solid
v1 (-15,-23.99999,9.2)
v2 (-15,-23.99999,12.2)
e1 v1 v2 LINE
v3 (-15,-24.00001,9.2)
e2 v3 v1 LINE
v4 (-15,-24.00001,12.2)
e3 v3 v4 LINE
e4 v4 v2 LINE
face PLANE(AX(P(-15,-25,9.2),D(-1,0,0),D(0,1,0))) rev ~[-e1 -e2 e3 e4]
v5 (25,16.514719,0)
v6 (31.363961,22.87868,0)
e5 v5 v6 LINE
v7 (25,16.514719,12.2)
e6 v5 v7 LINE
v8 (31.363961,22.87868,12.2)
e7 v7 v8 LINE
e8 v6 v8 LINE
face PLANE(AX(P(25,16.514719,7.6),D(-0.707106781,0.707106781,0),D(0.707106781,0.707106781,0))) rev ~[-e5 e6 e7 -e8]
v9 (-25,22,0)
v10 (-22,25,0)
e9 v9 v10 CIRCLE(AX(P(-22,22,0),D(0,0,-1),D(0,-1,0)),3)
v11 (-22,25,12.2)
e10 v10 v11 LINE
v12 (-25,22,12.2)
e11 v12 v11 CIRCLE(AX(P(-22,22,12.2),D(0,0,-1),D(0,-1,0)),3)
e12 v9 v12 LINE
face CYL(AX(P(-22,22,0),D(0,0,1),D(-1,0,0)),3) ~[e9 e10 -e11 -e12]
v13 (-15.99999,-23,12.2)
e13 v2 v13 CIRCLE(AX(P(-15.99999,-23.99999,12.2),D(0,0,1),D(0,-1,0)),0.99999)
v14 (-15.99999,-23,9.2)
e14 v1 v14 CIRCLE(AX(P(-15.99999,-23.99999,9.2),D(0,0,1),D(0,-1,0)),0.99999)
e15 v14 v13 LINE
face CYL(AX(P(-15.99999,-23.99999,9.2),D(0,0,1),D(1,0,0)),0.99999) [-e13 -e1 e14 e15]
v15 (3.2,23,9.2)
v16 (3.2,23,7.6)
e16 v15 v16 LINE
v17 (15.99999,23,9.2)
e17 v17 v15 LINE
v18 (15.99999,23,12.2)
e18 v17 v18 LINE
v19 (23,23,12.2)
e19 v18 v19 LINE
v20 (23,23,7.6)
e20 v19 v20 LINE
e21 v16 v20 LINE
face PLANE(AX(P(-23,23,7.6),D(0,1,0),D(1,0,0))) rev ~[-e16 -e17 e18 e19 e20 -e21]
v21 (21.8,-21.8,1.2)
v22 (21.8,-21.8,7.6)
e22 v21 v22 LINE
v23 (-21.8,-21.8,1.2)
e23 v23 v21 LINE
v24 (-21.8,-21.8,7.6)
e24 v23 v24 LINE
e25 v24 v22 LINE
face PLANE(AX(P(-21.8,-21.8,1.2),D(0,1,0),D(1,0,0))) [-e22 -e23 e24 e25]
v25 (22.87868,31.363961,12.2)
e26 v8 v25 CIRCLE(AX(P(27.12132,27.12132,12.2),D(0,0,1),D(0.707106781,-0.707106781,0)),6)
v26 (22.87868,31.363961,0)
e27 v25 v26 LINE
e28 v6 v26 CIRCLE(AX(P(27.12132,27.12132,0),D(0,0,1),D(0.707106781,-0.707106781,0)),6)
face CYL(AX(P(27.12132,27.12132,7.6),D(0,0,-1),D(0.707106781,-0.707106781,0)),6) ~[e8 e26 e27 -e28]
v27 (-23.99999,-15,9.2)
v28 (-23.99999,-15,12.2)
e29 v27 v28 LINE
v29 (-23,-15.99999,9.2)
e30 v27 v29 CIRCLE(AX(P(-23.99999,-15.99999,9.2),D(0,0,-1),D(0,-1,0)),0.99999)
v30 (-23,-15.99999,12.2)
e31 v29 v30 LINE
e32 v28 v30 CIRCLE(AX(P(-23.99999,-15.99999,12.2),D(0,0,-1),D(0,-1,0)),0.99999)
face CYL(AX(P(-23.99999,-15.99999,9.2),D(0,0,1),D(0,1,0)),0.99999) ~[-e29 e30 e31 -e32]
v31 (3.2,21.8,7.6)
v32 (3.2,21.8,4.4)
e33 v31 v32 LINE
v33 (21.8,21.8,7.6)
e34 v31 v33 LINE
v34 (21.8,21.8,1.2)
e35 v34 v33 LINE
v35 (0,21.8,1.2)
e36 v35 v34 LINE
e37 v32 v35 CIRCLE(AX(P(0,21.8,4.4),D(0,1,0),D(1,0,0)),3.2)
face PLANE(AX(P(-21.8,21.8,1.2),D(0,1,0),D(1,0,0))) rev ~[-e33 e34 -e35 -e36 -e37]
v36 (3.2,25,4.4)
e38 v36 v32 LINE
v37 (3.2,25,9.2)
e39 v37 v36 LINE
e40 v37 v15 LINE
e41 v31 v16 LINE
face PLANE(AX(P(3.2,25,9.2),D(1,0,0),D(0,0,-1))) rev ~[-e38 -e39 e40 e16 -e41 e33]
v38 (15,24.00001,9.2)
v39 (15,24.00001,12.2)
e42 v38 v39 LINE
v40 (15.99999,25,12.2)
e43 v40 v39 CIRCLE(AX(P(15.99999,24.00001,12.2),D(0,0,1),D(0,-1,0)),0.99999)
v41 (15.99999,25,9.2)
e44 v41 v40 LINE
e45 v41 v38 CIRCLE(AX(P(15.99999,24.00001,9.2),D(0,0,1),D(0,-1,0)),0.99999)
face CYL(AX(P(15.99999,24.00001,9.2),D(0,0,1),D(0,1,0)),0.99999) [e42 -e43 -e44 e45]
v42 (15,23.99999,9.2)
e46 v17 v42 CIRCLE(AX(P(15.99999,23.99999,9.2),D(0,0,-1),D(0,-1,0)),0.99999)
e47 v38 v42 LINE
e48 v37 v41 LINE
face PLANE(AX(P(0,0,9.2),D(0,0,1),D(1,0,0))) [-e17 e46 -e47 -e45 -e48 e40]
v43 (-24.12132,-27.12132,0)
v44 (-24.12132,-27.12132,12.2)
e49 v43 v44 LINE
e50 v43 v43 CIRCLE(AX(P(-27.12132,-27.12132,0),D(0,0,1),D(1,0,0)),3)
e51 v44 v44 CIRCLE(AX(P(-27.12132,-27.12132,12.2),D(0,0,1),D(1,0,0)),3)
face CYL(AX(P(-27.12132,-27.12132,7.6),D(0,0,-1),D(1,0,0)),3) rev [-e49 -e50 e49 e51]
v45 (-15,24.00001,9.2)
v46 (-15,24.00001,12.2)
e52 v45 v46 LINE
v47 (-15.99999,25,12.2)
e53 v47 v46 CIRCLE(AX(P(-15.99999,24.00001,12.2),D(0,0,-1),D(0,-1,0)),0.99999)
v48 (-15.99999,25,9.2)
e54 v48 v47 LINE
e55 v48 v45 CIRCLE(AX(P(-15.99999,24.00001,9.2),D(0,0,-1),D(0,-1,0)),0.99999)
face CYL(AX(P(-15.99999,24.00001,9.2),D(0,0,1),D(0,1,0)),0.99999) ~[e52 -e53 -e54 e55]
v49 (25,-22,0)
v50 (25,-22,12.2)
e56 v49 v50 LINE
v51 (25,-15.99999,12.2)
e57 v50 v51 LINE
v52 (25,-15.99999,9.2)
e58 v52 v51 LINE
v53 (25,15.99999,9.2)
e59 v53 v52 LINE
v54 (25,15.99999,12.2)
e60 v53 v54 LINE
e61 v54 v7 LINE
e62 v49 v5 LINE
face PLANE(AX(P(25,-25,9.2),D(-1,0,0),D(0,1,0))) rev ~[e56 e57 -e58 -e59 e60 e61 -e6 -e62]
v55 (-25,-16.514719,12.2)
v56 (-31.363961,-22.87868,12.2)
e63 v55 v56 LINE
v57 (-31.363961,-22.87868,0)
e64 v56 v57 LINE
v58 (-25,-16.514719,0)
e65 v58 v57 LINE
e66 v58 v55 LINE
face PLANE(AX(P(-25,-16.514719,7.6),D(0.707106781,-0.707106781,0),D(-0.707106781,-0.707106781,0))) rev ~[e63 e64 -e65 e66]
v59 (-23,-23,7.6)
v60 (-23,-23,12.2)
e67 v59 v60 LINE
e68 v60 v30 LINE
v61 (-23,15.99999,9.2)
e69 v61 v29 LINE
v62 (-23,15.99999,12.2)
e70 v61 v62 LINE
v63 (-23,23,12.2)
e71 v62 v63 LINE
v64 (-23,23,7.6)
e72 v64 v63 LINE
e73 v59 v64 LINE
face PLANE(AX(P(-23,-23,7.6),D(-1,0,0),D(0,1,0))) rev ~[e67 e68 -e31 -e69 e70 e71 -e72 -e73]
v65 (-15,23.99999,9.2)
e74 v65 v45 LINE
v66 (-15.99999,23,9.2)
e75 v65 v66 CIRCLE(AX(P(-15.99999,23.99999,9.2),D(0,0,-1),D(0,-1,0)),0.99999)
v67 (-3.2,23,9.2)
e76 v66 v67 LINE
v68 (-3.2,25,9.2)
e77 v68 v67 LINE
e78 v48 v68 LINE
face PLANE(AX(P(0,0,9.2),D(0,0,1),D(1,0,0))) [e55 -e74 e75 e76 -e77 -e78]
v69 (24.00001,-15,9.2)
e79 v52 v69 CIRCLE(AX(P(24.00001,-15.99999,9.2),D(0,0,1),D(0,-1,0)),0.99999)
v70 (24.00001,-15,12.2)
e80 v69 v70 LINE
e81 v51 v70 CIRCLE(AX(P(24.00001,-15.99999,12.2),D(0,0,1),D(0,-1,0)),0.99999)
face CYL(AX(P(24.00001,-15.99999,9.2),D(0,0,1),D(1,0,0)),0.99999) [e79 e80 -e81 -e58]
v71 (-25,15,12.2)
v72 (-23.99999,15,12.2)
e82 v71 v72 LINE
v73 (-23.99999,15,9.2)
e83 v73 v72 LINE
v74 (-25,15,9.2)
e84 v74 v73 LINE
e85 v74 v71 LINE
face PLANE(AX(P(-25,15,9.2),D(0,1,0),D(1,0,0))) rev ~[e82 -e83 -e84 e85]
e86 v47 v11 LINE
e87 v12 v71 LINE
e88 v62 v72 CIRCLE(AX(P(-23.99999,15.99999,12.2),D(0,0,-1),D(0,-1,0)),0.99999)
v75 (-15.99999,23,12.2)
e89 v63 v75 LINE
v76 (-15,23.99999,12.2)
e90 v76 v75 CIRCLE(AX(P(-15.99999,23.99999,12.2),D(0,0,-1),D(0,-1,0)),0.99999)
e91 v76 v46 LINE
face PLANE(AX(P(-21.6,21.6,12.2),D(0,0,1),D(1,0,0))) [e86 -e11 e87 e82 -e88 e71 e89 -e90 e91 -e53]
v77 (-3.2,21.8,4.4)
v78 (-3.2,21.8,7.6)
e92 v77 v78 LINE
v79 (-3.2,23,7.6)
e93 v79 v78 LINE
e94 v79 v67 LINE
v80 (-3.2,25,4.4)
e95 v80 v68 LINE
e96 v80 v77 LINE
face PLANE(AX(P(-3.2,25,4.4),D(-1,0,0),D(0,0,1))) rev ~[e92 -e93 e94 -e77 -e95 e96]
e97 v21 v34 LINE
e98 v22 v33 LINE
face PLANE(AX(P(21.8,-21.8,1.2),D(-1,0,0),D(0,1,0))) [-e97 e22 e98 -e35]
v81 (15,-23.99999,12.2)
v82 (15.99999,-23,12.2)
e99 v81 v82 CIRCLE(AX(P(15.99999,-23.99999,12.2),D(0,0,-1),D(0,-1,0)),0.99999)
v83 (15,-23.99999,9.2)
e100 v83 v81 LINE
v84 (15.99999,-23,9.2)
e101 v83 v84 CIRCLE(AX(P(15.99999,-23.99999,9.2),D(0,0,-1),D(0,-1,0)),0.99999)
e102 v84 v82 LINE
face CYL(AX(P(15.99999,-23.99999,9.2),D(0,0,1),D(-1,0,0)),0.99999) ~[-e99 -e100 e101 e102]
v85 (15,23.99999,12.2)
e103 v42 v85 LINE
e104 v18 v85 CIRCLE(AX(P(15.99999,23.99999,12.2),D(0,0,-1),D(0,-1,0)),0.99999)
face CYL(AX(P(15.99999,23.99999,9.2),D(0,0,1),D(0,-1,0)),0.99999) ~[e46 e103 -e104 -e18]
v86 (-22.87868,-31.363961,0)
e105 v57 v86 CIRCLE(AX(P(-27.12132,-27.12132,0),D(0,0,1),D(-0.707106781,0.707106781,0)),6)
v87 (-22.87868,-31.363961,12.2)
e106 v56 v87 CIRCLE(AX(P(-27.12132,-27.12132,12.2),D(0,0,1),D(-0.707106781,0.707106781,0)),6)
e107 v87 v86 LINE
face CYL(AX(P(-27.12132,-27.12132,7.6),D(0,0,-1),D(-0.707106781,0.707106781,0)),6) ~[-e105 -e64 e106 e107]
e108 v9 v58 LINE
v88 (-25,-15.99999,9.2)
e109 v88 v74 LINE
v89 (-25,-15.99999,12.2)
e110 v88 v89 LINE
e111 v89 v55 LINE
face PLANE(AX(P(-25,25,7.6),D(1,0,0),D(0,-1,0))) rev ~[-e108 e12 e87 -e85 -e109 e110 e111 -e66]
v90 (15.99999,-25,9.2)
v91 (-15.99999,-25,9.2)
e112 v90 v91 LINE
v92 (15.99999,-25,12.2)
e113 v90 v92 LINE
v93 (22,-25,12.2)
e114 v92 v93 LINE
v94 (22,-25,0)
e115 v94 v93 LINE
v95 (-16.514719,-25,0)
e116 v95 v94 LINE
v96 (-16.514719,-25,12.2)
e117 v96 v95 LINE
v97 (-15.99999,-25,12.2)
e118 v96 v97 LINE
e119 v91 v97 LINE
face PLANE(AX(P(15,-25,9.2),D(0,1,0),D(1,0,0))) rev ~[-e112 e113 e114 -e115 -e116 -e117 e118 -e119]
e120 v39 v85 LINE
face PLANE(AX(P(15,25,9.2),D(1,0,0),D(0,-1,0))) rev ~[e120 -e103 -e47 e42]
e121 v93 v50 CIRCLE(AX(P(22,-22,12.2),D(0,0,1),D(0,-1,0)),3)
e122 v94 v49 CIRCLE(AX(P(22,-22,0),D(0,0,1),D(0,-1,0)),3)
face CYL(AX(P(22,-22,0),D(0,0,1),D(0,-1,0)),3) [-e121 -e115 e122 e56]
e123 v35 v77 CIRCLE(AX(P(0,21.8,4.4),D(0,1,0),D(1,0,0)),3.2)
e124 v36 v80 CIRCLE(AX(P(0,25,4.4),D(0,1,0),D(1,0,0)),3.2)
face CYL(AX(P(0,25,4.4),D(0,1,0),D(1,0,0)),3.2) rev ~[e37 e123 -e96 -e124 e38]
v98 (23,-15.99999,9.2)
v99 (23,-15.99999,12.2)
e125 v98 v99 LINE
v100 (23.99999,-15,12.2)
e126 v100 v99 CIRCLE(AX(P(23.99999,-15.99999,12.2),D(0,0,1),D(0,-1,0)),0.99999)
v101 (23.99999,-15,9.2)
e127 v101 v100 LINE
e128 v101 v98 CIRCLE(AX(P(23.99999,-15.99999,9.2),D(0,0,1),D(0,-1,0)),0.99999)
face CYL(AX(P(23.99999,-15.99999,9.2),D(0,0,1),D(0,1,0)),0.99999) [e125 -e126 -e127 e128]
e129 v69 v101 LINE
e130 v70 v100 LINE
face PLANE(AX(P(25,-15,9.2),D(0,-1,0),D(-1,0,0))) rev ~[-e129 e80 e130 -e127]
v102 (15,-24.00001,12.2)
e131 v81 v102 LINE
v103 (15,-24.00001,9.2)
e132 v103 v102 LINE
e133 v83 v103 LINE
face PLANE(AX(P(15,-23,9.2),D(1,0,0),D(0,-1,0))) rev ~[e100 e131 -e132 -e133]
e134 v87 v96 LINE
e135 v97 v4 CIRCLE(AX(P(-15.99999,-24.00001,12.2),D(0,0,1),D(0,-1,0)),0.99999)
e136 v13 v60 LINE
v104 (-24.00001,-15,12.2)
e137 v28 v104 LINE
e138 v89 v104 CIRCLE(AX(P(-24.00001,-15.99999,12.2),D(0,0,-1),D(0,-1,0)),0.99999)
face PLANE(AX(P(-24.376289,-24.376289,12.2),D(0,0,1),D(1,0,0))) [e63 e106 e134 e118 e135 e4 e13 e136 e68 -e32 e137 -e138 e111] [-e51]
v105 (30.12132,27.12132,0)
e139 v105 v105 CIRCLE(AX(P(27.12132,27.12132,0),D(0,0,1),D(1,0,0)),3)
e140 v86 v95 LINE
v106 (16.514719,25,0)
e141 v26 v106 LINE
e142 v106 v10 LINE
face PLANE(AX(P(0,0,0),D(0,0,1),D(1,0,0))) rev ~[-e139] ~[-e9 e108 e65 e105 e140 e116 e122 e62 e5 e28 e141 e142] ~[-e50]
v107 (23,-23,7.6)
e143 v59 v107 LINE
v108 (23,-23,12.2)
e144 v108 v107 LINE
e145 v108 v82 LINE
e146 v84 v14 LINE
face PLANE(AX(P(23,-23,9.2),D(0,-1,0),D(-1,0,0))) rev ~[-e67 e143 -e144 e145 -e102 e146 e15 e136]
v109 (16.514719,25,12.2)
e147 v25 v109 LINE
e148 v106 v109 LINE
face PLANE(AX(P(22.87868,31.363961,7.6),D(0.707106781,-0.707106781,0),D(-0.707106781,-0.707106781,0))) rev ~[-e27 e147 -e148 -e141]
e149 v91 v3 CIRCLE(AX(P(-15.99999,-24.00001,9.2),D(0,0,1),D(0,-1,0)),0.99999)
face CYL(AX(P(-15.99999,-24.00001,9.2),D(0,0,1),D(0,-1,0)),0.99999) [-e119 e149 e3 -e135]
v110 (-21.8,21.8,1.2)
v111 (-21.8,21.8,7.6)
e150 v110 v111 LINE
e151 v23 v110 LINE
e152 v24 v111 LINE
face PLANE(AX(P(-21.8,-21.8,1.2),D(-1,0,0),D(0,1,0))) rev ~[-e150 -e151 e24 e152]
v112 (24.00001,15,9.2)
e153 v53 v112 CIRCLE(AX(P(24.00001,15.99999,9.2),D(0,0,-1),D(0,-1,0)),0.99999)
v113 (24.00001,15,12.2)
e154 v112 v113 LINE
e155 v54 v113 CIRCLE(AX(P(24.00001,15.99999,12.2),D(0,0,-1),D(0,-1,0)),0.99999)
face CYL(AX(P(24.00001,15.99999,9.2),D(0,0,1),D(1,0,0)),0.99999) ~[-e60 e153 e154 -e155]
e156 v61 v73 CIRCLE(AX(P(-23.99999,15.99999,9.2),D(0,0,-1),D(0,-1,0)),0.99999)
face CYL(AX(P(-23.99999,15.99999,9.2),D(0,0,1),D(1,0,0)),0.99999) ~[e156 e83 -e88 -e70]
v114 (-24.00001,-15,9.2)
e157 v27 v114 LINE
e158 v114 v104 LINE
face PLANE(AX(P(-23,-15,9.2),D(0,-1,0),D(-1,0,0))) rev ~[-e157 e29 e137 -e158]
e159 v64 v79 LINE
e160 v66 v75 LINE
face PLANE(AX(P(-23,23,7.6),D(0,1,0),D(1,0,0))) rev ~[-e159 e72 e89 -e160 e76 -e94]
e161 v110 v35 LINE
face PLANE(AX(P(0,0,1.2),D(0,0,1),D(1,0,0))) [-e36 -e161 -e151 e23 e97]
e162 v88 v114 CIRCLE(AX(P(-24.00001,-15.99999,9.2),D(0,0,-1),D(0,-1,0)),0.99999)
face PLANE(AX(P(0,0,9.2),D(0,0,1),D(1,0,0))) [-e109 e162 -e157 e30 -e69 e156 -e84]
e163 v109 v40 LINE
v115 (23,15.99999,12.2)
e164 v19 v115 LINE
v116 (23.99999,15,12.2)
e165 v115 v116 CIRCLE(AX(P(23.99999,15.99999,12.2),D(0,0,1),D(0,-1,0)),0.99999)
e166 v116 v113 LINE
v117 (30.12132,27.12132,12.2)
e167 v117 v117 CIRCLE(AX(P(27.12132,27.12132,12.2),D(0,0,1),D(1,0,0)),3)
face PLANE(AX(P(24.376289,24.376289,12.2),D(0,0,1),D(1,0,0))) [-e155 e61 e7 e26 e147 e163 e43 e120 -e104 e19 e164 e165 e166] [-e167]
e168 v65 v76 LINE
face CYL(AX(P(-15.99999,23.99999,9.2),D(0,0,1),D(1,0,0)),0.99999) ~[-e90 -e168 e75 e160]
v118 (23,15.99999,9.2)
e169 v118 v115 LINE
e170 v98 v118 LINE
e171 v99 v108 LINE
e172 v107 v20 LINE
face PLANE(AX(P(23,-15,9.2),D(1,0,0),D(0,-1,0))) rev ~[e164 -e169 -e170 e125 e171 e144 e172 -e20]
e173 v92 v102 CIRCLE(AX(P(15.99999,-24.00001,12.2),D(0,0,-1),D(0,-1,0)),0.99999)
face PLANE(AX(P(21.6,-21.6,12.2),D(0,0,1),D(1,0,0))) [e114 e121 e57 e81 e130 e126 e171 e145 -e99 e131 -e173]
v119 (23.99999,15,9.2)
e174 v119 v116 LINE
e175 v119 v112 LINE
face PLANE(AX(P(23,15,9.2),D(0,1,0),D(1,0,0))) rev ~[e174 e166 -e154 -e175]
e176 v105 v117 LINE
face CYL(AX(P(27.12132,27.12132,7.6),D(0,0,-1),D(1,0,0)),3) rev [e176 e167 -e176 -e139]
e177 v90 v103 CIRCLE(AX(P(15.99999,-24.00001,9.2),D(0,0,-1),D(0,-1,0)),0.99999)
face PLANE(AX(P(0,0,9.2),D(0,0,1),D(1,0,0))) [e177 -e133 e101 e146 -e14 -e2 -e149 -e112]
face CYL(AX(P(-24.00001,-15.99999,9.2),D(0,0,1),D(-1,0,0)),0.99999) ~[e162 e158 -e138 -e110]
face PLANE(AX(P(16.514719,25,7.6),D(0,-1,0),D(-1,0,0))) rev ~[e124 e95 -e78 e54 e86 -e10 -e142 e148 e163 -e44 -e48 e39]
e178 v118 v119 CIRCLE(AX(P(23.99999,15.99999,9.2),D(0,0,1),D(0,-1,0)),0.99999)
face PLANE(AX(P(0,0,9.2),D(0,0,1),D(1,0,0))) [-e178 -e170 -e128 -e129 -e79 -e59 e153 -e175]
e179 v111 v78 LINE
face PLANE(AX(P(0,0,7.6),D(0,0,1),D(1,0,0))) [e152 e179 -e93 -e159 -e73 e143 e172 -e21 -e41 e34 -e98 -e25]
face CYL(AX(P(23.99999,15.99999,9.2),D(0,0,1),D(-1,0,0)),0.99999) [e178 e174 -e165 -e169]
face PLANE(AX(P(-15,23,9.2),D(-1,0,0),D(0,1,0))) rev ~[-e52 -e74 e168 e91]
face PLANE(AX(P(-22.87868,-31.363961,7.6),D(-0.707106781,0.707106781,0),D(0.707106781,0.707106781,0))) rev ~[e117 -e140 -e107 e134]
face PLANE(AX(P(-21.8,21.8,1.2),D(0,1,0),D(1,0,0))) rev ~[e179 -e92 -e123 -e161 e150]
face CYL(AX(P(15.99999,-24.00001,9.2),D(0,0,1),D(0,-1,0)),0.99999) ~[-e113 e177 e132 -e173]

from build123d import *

# Parameters (mm, degrees)
F0_R     = 3
F1_DEPTH = 1.2
F2_R     = 3
F2_W     = 43.6
F2_H     = 43.6
F3_DEPTH = 6.4
F4_R     = 3
F4_W     = 46
F4_H     = 46
F5_DEPTH = 1.6
F6_R     = 3
F7_DEPTH = 3
F9_DEPTH = 3.2
F10_R    = 0.99999
F11_R    = 3


# Not quite as in the source:
# - a fillet or chamfer is up to 0.001 mm smaller than in the source, because OpenCascade refuses the exact size


with BuildPart() as f1:
    # F0 (on Top) → F1 (new body)
    with BuildSketch(Plane.XY):
        with BuildLine():
            Line((22.8786796564, 31.3639610307), (16.5147186258, 25))
            Line((16.5147186258, 25), (-25, 25))
            Line((-25, 25), (-25, -16.5147186258))
            Line((-25, -16.5147186258), (-31.3639610307, -22.8786796564))
            ThreePointArc((-31.3639610307, -22.8786796564), (-31.3639610307, -31.3639610307), (-22.8786796564, -31.3639610307))
            Line((-22.8786796564, -31.3639610307), (-16.5147186258, -25))
            Line((-16.5147186258, -25), (25, -25))
            Line((25, -25), (25, 16.5147186258))
            Line((25, 16.5147186258), (31.3639610307, 22.8786796564))
            ThreePointArc((31.3639610307, 22.8786796564), (31.3639610307, 31.3639610307), (22.8786796564, 31.3639610307))
        make_face()
        with Locations((-27.1213203436, -27.1213203436)):
            Circle(F0_R, mode=Mode.SUBTRACT)
        with Locations((27.1213203436, 27.1213203436)):
            Circle(F0_R, mode=Mode.SUBTRACT)
    extrude(amount=F1_DEPTH)

    # F2 (on face) → F3 (join)
    with BuildSketch(Plane.XY.offset(1.2)):
        with BuildLine():
            Line((-16.5147186258, -25), (25, -25))
            Line((25, -25), (25, 16.5147186258))
            Line((25, 16.5147186258), (31.3639610307, 22.8786796564))
            ThreePointArc((31.3639610307, 22.8786796564), (31.3639610307, 31.3639610307), (22.8786796564, 31.3639610307))
            Line((22.8786796564, 31.3639610307), (16.5147186258, 25))
            Line((16.5147186258, 25), (-25, 25))
            Line((-25, 25), (-25, -16.5147186258))
            Line((-25, -16.5147186258), (-31.3639610307, -22.8786796564))
            ThreePointArc((-31.3639610307, -22.8786796564), (-31.3639610307, -31.3639610307), (-22.8786796564, -31.3639610307))
            Line((-22.8786796564, -31.3639610307), (-16.5147186258, -25))
        make_face()
        with Locations((-27.1213203436, -27.1213203436)):
            Circle(F2_R, mode=Mode.SUBTRACT)
        Rectangle(F2_W, F2_H, mode=Mode.SUBTRACT)
        with Locations((27.1213203436, 27.1213203436)):
            Circle(F2_R, mode=Mode.SUBTRACT)
    extrude(amount=F3_DEPTH)

    # F4 (on face) → F5 (join)
    with BuildSketch(Plane.XY.offset(7.6)):
        with BuildLine():
            Line((-16.5147186258, -25), (25, -25))
            Line((25, -25), (25, 16.5147186258))
            Line((25, 16.5147186258), (31.3639610307, 22.8786796564))
            ThreePointArc((31.3639610307, 22.8786796564), (31.3639610307, 31.3639610307), (22.8786796564, 31.3639610307))
            Line((22.8786796564, 31.3639610307), (16.5147186258, 25))
            Line((16.5147186258, 25), (-25, 25))
            Line((-25, 25), (-25, -16.5147186258))
            Line((-25, -16.5147186258), (-31.3639610307, -22.8786796564))
            ThreePointArc((-31.3639610307, -22.8786796564), (-31.3639610307, -31.3639610307), (-22.8786796564, -31.3639610307))
            Line((-22.8786796564, -31.3639610307), (-16.5147186258, -25))
        make_face()
        with Locations((-27.1213203436, -27.1213203436)):
            Circle(F4_R, mode=Mode.SUBTRACT)
        Rectangle(F4_W, F4_H, mode=Mode.SUBTRACT)
        with Locations((27.1213203436, 27.1213203436)):
            Circle(F4_R, mode=Mode.SUBTRACT)
    extrude(amount=F5_DEPTH)

    # F6 (on face) → F7 (join)
    with BuildSketch(Plane.XY.offset(9.2)):
        Polygon((15, -25), (25, -25), (25, -15), (23, -15), (23, -23), (15, -23), align=None)
        with BuildLine():
            Line((25, 15), (25, 16.5147186258))
            Line((25, 16.5147186258), (31.3639610307, 22.8786796564))
            ThreePointArc((31.3639610307, 22.8786796564), (31.3639610307, 31.3639610307), (22.8786796564, 31.3639610307))
            Line((22.8786796564, 31.3639610307), (16.5147186258, 25))
            Line((16.5147186258, 25), (15, 25))
            Line((15, 25), (15, 23))
            Line((15, 23), (23, 23))
            Line((23, 23), (23, 15))
            Line((23, 15), (25, 15))
        make_face()
        with Locations((27.1213203436, 27.1213203436)):
            Circle(F6_R, mode=Mode.SUBTRACT)
        Polygon((-15, 25), (-25, 25), (-25, 15), (-23, 15), (-23, 23), (-15, 23), align=None)
        with BuildLine():
            Line((-25, -15), (-25, -16.5147186258))
            Line((-25, -16.5147186258), (-31.3639610307, -22.8786796564))
            ThreePointArc((-31.3639610307, -22.8786796564), (-31.3639610307, -31.3639610307), (-22.8786796564, -31.3639610307))
            Line((-22.8786796564, -31.3639610307), (-16.5147186258, -25))
            Line((-16.5147186258, -25), (-15, -25))
            Line((-15, -25), (-15, -23))
            Line((-15, -23), (-23, -23))
            Line((-23, -23), (-23, -15))
            Line((-23, -15), (-25, -15))
        make_face()
        with Locations((-27.1213203436, -27.1213203436)):
            Circle(F6_R, mode=Mode.SUBTRACT)
    extrude(amount=F7_DEPTH)

    # F8 (on face) → F9 (cut, through all)
    with BuildSketch(Plane(origin=(0, 25, 0), x_dir=(-1, 0, 0), z_dir=(0, 1, 0))):
        with BuildLine():
            Line((-3.2, 9.2), (-3.2, 4.4))
            ThreePointArc((-3.2, 4.4), (0, 1.2), (3.2, 4.4))
            Line((3.2, 4.4), (3.2, 9.2))
            Line((3.2, 9.2), (-3.2, 9.2))
        make_face()
    extrude(amount=-F9_DEPTH, mode=Mode.SUBTRACT)

    # F10 (radius 1 in the source; OpenCascade refuses exactly that, so slightly less here)
    f10_edges = [f1.edges().sort_by_distance(p)[0] for p in [
        (25, -15, 10.7),
        (23, -15, 10.7),
        (15, -25, 10.7),
        (15, -23, 10.7),
        (-15, -25, 10.7),
        (-15, -23, 10.7),
        (-23, -15, 10.7),
        (-23, 15, 10.7),
        (-25, -15, 10.7),
        (-15, 23, 10.7),
        (-15, 25, 10.7),
        (15, 23, 10.7),
        (15, 25, 10.7),
        (23, 15, 10.7),
        (25, 15, 10.7),
    ]]
    fillet(f10_edges, radius=F10_R)

    # F11
    f11_edges = [f1.edges().sort_by_distance(p)[0] for p in [
        (-25, 25, 6.1),
        (25, -25, 6.1),
    ]]
    fillet(f11_edges, radius=F11_R)


solid = f1.part
